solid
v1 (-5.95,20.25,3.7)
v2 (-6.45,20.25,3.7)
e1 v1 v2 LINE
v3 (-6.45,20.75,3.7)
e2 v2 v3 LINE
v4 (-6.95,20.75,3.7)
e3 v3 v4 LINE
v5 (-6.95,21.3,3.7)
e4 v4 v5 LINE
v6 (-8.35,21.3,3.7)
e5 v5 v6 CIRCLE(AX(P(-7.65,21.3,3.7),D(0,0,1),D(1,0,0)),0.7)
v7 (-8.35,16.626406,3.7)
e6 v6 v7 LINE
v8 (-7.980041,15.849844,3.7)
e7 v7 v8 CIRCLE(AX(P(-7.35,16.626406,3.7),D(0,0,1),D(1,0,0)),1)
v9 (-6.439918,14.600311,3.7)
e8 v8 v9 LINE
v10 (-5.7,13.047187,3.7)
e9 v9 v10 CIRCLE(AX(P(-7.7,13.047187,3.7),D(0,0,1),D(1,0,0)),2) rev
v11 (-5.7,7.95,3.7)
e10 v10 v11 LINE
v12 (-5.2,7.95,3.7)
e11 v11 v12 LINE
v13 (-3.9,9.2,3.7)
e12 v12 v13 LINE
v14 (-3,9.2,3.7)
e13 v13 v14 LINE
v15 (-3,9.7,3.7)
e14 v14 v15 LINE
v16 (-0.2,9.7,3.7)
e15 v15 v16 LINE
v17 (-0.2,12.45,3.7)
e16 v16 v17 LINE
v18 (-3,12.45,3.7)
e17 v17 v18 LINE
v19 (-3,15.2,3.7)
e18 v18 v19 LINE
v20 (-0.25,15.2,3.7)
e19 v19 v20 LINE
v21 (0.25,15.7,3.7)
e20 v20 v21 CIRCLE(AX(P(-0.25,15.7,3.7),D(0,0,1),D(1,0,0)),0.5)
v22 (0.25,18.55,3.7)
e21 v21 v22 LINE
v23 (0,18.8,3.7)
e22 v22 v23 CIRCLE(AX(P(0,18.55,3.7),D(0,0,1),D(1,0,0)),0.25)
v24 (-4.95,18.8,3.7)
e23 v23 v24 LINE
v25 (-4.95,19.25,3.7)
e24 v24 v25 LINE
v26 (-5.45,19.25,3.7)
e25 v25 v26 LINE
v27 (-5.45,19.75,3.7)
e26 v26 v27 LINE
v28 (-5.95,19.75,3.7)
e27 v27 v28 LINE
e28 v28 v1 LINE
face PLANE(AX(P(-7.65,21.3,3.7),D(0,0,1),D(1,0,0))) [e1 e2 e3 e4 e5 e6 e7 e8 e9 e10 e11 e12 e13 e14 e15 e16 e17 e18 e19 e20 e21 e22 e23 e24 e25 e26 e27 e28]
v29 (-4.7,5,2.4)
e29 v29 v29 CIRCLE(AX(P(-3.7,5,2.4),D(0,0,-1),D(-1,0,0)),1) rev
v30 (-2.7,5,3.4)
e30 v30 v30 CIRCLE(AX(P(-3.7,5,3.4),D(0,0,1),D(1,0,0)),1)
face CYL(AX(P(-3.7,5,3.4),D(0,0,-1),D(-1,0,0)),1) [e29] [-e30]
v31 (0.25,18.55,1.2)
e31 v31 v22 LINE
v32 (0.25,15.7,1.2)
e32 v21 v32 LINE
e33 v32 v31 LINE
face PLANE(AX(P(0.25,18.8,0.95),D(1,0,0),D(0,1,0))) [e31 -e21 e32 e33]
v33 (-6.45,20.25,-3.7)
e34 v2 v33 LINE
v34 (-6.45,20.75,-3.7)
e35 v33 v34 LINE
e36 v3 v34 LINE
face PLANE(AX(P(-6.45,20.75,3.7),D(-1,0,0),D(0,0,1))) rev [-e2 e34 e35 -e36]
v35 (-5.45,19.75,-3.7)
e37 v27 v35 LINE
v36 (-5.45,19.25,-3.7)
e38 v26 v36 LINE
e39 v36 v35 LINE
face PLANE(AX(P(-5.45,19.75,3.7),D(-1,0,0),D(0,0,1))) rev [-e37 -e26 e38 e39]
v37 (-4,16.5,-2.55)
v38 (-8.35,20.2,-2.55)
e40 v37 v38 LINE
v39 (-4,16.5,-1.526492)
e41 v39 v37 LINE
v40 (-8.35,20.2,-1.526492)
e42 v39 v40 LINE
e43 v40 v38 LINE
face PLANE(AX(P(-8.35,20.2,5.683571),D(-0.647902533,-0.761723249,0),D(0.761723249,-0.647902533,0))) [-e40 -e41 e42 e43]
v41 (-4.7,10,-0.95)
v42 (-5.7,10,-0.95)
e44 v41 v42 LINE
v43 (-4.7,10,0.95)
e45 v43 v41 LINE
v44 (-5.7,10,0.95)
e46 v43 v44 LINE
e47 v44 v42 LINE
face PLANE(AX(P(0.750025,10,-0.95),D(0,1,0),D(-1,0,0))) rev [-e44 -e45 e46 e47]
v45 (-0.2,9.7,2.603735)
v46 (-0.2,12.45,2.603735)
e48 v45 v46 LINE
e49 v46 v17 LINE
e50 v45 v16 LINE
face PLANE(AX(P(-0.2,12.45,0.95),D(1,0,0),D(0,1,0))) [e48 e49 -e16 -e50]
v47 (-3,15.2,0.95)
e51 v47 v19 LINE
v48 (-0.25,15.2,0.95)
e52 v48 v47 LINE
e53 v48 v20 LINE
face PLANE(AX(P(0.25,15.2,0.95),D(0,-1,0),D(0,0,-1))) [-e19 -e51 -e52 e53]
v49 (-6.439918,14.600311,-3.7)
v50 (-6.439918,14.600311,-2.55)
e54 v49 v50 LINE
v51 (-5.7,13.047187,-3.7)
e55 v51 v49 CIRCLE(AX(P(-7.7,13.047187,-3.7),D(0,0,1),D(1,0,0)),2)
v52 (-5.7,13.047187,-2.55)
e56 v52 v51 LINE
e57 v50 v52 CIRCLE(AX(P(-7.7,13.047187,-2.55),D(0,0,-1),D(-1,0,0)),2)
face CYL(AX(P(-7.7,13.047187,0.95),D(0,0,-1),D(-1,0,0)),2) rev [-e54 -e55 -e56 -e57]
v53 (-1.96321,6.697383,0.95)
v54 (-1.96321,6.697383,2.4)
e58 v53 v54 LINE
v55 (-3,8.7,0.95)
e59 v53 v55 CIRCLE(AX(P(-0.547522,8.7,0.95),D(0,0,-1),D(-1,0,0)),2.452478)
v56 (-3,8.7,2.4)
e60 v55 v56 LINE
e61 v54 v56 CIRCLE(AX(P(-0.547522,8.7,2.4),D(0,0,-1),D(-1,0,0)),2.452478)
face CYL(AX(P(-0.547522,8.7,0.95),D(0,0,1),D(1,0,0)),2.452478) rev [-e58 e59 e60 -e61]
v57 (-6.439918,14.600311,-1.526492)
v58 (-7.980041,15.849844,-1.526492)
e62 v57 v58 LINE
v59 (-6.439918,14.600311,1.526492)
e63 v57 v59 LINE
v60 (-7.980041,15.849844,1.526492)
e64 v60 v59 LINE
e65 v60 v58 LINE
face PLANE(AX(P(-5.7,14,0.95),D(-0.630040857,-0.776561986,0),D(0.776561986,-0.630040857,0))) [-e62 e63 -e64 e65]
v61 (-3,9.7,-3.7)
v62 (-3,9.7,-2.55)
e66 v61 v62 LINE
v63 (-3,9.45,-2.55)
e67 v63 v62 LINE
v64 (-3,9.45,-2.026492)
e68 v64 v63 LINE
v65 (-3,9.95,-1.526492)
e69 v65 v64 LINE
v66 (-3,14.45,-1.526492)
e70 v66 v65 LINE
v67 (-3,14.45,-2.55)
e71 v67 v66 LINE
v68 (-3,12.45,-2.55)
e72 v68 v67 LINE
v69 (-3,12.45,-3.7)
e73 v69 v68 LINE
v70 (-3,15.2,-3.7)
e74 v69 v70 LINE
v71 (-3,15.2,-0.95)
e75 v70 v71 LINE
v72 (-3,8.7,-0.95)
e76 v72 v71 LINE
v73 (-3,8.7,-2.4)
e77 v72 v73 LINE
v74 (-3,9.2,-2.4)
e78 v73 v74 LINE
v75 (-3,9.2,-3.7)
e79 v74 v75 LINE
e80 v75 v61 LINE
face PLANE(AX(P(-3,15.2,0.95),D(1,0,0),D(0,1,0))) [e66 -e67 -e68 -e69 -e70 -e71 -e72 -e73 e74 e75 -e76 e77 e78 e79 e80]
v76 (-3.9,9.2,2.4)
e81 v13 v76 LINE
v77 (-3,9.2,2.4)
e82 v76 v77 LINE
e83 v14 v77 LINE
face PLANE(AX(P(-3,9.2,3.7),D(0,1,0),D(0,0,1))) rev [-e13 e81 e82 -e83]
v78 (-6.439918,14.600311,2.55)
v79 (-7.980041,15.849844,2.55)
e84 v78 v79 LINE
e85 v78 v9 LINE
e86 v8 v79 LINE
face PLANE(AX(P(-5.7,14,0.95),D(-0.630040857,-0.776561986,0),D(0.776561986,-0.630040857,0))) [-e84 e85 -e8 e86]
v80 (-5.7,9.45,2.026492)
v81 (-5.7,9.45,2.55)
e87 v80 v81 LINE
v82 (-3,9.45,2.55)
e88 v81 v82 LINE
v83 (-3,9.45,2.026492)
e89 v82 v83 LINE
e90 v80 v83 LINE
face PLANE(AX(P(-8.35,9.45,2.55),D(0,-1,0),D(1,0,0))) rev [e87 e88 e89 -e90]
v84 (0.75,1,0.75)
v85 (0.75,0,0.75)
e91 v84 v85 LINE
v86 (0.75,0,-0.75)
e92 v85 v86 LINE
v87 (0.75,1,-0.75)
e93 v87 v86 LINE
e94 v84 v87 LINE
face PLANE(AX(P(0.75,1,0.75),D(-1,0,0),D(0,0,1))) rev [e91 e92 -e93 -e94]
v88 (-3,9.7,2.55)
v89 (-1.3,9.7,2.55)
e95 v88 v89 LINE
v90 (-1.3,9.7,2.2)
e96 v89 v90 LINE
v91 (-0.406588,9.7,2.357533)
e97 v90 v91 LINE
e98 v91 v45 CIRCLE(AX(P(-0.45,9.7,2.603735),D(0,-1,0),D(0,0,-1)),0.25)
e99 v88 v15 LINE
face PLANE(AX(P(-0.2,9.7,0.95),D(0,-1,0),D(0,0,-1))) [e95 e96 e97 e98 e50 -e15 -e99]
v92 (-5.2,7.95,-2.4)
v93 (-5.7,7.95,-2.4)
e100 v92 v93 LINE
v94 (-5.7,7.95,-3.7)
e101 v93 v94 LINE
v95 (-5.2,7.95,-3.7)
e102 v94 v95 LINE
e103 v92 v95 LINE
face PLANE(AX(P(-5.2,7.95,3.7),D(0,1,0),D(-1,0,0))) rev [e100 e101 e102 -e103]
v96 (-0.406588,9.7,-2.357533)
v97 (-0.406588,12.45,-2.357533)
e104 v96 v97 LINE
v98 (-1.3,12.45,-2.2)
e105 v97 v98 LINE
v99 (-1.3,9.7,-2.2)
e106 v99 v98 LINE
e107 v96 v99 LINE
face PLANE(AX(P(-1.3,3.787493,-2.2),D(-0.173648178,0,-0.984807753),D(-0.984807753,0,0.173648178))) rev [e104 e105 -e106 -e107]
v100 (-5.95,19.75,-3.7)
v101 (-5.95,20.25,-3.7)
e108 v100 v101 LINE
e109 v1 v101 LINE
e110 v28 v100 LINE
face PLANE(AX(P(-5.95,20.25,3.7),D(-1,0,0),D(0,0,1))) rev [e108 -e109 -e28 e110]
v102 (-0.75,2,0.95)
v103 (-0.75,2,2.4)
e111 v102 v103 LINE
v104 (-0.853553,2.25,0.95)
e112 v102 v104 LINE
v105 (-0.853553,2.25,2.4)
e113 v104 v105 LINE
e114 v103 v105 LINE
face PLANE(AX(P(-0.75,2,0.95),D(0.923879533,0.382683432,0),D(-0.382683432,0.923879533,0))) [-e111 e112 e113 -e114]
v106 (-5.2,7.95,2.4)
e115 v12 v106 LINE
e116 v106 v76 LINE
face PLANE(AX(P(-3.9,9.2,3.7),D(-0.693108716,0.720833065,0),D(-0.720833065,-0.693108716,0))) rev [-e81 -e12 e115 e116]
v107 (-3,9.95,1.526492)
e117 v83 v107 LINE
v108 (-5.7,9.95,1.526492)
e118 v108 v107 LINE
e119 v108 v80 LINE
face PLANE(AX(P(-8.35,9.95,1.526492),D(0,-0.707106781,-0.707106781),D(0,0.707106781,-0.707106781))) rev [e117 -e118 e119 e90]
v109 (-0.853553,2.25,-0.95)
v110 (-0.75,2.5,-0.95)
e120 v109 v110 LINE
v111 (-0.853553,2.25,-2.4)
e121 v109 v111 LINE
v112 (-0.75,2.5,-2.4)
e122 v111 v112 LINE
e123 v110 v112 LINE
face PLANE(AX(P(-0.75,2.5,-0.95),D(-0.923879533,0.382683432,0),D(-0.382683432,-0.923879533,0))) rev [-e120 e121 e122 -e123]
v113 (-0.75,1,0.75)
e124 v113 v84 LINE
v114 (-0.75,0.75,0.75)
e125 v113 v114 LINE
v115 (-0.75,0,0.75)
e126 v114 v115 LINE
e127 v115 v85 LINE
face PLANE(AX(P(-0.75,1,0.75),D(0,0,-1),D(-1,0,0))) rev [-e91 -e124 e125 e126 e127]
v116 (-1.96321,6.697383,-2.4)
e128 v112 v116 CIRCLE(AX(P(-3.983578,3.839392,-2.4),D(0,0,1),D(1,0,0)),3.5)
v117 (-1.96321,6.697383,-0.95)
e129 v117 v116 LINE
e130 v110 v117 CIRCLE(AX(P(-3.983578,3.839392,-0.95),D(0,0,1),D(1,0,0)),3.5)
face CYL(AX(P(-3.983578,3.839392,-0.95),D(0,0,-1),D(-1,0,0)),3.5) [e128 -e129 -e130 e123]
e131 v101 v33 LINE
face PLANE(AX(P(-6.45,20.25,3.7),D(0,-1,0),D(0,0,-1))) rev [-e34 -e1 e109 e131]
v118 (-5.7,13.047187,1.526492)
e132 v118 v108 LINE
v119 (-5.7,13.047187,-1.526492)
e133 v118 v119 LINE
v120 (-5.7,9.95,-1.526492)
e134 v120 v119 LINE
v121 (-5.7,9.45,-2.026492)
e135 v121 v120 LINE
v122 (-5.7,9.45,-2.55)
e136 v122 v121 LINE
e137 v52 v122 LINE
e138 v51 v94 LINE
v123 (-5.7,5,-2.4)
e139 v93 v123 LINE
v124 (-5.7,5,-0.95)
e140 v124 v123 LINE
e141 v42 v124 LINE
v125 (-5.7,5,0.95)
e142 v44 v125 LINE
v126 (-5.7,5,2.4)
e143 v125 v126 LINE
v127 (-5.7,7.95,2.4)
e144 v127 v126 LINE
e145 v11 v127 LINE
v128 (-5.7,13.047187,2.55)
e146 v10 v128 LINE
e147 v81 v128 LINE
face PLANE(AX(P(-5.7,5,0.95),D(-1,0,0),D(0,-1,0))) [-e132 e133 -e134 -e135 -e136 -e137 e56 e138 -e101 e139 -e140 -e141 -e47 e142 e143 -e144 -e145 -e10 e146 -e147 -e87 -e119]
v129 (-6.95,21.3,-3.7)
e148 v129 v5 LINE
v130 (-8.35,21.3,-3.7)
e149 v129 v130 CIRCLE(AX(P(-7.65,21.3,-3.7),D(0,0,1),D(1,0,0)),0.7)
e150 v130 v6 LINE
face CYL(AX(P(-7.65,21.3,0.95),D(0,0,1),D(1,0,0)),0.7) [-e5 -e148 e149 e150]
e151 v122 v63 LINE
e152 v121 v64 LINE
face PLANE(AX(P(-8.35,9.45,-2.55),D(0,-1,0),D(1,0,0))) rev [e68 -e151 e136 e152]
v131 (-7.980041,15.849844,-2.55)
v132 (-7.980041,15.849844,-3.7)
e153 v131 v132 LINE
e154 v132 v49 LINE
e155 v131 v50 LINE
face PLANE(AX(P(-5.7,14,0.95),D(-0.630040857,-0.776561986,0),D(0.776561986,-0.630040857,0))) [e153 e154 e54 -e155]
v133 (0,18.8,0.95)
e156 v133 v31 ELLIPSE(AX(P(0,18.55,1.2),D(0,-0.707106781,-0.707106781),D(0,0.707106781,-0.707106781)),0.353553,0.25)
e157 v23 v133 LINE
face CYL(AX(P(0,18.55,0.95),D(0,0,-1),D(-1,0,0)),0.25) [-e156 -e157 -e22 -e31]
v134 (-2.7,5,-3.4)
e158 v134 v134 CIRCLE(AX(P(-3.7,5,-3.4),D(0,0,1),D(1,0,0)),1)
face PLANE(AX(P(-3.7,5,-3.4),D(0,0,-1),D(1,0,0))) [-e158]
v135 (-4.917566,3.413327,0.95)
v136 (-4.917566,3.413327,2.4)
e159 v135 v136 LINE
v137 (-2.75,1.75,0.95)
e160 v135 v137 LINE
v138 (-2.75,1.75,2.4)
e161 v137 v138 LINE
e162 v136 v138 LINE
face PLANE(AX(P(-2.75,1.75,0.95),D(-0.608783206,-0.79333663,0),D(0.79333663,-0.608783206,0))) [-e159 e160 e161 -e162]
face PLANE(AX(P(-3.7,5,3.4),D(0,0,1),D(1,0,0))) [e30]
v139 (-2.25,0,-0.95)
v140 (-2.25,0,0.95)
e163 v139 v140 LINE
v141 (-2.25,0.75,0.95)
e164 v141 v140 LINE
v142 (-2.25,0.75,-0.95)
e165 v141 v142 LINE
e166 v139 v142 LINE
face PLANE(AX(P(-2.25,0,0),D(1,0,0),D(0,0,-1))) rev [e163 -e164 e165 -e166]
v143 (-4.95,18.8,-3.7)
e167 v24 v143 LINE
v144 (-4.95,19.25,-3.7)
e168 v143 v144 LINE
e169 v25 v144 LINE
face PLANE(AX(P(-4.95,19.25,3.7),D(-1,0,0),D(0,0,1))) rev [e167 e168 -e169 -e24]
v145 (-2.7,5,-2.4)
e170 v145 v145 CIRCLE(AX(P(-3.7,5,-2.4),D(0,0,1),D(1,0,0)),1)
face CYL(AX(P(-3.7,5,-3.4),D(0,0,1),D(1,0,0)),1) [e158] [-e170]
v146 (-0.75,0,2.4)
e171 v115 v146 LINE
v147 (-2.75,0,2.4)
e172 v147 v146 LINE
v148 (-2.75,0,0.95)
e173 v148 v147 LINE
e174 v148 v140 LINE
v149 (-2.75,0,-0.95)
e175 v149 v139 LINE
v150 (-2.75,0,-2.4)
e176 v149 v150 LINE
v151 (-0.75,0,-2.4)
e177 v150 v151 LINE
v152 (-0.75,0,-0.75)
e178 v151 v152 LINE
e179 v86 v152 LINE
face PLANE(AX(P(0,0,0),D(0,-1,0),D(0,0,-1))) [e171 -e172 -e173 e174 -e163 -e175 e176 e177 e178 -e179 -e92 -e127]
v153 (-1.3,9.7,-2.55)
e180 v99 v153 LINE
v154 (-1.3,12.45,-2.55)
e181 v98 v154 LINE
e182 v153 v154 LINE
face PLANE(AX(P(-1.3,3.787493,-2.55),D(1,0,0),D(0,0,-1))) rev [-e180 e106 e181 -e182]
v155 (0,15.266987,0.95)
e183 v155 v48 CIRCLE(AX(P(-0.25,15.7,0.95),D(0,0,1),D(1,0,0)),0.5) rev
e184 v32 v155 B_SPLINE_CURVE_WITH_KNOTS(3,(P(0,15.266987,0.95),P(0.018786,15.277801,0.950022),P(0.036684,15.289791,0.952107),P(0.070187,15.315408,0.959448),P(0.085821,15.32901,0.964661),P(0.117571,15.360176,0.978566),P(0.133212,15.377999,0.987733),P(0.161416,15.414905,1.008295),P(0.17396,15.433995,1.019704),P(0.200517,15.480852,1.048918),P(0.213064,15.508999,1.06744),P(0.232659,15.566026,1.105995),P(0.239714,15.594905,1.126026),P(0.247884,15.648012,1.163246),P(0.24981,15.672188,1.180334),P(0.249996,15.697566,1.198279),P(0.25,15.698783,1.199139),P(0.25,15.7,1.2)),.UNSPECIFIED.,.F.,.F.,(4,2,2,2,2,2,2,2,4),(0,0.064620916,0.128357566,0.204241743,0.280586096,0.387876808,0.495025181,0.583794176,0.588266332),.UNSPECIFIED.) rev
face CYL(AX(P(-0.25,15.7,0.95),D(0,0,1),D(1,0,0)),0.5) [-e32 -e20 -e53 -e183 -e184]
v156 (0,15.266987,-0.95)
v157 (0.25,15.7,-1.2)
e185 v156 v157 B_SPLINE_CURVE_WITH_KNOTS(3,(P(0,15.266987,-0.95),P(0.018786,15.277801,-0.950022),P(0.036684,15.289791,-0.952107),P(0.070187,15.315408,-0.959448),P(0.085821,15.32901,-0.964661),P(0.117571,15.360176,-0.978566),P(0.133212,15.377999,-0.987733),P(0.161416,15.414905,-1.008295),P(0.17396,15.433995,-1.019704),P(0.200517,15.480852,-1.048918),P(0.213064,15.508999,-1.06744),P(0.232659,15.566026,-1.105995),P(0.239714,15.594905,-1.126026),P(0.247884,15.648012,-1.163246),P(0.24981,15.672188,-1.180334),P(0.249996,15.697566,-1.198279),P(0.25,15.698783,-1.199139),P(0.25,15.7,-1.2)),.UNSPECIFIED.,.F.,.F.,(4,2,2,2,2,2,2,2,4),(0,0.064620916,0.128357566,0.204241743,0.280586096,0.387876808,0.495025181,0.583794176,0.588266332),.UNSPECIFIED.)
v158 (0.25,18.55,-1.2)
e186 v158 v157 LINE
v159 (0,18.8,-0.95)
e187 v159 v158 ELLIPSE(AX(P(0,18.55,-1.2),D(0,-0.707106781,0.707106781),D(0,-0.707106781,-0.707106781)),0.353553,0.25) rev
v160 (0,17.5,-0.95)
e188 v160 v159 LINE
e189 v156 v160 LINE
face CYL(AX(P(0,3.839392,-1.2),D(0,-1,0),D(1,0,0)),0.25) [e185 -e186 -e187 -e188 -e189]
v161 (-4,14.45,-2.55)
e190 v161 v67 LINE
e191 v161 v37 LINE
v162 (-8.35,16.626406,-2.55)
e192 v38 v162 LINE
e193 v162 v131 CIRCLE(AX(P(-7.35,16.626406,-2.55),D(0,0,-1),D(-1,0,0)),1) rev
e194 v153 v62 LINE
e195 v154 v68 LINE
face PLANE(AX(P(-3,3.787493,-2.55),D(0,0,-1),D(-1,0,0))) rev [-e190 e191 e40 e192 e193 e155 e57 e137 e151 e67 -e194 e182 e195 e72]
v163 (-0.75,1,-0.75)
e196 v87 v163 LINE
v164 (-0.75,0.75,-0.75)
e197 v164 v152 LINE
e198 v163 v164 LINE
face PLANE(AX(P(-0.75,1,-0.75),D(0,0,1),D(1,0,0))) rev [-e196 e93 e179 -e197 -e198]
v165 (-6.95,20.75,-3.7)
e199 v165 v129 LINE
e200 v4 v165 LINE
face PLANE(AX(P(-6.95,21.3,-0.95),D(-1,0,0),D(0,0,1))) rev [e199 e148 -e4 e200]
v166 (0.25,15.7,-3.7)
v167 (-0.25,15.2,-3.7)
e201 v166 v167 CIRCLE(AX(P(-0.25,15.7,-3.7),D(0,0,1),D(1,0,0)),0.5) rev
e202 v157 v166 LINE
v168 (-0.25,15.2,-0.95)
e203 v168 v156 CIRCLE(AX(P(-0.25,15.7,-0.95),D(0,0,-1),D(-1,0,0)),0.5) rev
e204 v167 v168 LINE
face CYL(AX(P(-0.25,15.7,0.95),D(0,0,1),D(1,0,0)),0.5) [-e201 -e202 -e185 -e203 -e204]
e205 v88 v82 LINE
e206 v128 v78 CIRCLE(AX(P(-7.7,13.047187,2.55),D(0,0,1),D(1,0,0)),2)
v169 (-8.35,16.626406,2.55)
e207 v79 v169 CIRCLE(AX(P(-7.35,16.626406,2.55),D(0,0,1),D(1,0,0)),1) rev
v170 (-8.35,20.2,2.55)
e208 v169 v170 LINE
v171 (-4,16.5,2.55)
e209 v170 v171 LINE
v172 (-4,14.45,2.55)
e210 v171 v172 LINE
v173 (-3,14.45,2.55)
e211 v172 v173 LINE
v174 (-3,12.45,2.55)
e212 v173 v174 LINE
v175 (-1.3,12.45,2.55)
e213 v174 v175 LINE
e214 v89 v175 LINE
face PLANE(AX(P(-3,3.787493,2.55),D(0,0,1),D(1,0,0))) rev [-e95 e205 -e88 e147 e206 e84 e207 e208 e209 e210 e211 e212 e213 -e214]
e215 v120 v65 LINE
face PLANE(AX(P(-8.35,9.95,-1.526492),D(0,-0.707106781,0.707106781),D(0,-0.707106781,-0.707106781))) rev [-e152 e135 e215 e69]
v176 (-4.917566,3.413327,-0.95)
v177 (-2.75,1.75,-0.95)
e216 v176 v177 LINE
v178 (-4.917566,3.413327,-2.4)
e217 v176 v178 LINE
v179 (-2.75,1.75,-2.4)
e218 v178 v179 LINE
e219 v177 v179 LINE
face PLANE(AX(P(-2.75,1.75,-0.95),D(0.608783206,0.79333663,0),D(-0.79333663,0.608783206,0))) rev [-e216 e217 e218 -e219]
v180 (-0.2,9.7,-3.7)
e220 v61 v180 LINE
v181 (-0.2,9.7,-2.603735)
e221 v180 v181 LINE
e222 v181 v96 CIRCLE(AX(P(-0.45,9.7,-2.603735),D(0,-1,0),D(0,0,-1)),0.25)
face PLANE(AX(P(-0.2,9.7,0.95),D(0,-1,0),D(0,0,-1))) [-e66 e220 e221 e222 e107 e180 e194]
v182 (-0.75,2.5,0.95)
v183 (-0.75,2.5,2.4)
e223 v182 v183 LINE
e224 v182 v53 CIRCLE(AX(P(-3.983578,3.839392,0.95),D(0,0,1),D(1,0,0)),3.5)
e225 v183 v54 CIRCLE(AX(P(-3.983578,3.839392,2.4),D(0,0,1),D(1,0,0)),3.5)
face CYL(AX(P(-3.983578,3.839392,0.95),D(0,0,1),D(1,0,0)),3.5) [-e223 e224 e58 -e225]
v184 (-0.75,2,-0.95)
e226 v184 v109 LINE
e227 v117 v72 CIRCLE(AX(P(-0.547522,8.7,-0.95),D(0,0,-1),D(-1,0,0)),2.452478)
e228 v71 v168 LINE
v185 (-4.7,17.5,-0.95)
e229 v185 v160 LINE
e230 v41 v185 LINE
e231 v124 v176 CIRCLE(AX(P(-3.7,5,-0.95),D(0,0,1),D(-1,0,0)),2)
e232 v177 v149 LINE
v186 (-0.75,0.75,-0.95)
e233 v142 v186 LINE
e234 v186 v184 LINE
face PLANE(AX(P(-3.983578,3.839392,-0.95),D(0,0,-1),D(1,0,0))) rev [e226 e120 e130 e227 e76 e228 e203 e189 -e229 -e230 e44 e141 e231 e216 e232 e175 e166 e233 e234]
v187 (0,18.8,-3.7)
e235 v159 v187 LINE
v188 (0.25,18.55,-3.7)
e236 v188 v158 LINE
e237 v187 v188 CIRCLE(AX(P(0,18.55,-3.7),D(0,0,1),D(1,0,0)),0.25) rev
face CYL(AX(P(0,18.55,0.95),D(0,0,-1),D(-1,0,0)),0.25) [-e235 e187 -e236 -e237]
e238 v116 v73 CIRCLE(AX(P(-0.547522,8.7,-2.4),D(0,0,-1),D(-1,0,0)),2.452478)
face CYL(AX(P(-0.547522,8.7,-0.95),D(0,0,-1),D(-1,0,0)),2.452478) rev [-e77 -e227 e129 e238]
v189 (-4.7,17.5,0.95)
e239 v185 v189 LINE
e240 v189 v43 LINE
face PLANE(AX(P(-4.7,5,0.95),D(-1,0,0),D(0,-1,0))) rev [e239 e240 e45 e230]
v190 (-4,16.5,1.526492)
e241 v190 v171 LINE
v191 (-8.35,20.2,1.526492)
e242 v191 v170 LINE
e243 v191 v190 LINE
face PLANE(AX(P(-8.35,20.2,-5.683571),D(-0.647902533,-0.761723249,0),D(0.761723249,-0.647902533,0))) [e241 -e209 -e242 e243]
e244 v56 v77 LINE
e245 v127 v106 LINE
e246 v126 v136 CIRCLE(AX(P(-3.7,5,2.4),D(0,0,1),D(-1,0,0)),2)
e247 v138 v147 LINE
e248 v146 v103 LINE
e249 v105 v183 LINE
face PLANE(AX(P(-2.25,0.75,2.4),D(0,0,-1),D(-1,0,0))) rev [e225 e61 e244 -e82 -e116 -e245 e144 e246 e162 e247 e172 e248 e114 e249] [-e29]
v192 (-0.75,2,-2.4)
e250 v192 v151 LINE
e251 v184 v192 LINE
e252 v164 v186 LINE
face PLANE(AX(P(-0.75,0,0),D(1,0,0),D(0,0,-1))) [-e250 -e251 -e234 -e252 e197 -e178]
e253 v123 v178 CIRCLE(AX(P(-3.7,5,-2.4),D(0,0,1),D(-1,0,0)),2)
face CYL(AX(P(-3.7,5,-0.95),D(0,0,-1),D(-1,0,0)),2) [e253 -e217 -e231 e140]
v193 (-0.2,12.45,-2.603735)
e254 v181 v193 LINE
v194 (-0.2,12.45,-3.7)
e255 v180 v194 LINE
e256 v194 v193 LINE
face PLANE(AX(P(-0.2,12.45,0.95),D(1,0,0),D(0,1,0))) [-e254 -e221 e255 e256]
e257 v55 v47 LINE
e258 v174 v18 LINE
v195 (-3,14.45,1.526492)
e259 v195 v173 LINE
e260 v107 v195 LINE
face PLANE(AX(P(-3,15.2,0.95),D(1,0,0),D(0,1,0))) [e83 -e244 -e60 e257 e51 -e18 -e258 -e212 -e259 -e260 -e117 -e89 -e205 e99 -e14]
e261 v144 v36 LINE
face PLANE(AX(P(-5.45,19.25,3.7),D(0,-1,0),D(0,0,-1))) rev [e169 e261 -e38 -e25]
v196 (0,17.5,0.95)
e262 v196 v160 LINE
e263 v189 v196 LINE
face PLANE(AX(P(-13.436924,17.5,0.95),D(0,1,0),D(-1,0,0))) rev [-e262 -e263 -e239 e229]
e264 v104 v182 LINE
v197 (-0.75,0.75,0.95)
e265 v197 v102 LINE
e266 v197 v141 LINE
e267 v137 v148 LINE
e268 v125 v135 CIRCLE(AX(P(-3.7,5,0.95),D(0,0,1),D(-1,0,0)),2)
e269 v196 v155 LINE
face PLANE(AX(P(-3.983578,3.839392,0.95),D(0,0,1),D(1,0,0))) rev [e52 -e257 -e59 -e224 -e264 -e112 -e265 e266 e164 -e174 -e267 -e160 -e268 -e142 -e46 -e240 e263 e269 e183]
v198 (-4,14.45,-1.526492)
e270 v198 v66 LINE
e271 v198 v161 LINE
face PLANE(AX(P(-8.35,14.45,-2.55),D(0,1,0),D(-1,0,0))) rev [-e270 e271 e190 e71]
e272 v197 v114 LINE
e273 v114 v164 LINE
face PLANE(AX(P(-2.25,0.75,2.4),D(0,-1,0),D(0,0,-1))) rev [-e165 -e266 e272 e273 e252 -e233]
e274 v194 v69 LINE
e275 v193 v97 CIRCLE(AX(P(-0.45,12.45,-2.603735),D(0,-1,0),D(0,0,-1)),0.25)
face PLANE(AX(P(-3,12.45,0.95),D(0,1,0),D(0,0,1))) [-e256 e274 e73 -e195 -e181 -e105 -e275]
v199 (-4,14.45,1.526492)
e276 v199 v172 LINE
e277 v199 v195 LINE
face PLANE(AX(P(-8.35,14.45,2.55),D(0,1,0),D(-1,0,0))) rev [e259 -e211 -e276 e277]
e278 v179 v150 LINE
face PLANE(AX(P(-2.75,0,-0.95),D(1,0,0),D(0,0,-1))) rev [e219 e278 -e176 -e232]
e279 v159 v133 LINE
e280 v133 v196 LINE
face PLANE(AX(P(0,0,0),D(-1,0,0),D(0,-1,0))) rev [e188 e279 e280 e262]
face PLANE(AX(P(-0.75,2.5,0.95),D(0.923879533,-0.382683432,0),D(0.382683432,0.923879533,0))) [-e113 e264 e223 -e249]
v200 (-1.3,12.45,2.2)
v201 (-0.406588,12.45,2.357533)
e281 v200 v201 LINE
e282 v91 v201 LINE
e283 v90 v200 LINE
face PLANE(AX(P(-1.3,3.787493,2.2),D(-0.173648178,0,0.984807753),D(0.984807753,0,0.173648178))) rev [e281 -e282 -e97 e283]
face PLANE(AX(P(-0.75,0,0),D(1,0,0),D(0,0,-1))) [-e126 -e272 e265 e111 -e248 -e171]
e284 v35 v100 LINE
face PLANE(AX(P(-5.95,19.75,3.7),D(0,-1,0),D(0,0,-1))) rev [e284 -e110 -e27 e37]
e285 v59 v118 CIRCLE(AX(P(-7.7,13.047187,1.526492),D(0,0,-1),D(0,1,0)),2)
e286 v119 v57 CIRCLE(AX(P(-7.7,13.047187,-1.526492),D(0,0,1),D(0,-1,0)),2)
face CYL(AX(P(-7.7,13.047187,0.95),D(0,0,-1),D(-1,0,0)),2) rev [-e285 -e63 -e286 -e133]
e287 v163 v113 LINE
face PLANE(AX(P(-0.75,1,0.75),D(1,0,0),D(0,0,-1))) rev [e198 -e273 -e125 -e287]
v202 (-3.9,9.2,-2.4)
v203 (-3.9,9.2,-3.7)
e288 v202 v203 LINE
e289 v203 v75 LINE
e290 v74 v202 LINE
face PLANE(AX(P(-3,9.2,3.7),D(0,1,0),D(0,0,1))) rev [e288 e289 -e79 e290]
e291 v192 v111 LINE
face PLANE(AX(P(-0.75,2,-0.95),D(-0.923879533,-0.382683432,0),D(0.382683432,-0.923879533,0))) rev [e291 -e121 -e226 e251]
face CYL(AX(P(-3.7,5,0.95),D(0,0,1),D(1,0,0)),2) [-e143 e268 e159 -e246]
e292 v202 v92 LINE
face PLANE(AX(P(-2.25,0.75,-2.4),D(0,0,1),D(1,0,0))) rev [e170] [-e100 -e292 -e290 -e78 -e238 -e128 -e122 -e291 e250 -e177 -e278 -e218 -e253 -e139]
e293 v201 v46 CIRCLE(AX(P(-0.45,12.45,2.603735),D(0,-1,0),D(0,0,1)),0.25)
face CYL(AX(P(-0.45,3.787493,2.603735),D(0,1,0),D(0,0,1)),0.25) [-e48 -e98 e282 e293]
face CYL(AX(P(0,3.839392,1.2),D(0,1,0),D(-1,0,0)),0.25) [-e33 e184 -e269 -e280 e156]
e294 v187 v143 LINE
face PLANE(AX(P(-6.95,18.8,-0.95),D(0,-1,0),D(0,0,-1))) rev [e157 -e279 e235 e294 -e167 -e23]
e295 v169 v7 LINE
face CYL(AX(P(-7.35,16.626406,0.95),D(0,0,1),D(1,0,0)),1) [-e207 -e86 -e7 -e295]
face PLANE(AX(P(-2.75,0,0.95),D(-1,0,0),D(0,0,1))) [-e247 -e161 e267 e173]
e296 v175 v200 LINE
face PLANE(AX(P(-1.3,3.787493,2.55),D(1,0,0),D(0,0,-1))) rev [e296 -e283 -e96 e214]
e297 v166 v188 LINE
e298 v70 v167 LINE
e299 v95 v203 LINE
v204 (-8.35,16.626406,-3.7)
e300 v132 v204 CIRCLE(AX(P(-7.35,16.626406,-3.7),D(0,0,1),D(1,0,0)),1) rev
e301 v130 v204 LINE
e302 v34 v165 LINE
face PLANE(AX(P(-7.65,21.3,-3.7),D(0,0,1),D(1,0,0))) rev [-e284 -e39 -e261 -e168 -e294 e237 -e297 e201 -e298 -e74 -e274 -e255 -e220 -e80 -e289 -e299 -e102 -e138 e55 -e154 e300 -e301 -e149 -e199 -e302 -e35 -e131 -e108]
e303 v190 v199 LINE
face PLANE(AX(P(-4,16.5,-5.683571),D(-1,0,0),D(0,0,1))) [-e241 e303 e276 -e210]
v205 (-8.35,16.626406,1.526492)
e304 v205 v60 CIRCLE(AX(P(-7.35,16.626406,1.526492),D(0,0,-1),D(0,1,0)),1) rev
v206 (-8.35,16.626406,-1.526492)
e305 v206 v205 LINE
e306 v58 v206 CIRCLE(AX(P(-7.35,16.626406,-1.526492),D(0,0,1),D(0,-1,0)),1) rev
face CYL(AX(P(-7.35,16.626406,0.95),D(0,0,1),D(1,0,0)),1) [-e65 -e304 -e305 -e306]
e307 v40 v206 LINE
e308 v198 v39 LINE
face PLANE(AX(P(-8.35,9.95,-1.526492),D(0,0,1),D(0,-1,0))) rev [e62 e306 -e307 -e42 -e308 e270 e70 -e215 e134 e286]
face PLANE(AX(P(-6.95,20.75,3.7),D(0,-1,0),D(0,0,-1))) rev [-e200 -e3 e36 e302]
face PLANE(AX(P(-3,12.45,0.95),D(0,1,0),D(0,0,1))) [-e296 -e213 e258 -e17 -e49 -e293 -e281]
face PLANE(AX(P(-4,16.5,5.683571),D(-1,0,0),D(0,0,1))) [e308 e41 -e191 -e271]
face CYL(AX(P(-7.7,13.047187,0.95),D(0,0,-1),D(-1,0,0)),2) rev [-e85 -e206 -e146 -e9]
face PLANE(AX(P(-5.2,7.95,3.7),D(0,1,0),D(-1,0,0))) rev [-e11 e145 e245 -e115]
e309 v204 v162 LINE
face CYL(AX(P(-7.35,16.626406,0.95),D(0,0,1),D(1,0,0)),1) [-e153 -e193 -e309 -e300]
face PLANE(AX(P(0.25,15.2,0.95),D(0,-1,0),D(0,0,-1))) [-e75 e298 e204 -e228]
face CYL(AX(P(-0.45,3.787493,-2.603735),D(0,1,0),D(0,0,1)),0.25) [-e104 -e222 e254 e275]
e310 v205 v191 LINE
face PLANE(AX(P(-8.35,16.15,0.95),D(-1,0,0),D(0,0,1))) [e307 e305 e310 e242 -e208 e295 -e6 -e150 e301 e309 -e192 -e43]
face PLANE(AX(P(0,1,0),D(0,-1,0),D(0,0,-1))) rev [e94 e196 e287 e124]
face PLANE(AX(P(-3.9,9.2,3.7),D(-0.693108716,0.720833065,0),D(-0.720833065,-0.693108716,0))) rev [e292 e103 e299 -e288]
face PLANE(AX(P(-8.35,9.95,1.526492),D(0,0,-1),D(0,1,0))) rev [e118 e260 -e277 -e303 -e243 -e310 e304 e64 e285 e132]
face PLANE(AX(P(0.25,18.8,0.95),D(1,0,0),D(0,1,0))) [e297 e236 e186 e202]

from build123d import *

# Parameters (mm, degrees)
SKETCH1_W                 = 1.5
SKETCH1_H                 = 1.5
BASE_BLOCK_DEPTH          = 1
SKETCH2_W                 = 4.8
SKETCH2_H                 = 0.75
BASE_BRIDGE_DEPTH         = 1.5
LOWER_SIDE_1_DEPTH        = 1.45
SKETCH6_R                 = 1
PIVOT_DEPTH               = 1
BODY_BLOCK_DEPTH          = 3.7
SKETCH8_W                 = 1.9
SKETCH8_H                 = 8.25
REAR_CUT_THROUGH_DEPTH    = 24.222672112
CLIP_FORMING_DEPTH        = 2.75
THROUGH_HOLES_DEPTH       = 23.941501695
SKETCH11_W                = 1.9
SKETCH11_H                = 7.5
PCB_SLOT_DEPTH            = 4.95
THROUGH_HOLE_REAR_1_DEPTH = 1.023508356
THROUGH_HOLE_REAR_2_DEPTH = 1.023508356
SKETCH15_W                = 1.9
SKETCH15_H                = 1.3
PCB_SLOT_TOP_DEPTH        = 0.25
REAR_FILLET_2MM_R         = 2
REAR_FILLET_1MM_R         = 1
GUIDE_FILLET_0_25MM_R     = 0.25
GUIDE_FILLET_0_5MM_R      = 0.5


# Some blends are built 0.0001 mm under size
with BuildPart() as part:
    # Sketch1 → Base Block (new body)
    with BuildSketch(Plane(origin=(0, 0, 0), x_dir=(1, 0, 0), z_dir=(0, 1, 0))):
        Rectangle(SKETCH1_W, SKETCH1_H)
    extrude(amount=BASE_BLOCK_DEPTH)

    # Sketch2 → Base Bridge (add)
    with BuildSketch(Plane.ZY.offset(0.75)):
        with Locations((0, 0.375)):
            Rectangle(SKETCH2_W, SKETCH2_H)
    extrude(amount=BASE_BRIDGE_DEPTH)

    # Sketch5 → Lower Side 1 (add)
    with BuildSketch(Plane.XY.offset(2.4)):
        with BuildLine():
            Line((-0.75, 0), (-2.75, 0))
            Line((-2.75, 0), (-2.75, 1.75))
            Line((-2.75, 1.75), (-4.917566413, 3.413326741))
            ThreePointArc((-4.917566413, 3.413326741), (-5.493757624, 4.115447239), (-5.7, 5))
            Line((-5.7, 5), (-5.7, 14))
            Line((-5.7, 14), (-8.35, 16.15))
            Line((-8.35, 16.15), (-8.35, 21.3))
            ThreePointArc((-8.35, 21.3), (-7.65, 22), (-6.95, 21.3))
            Line((-6.95, 21.3), (-6.95, 18.8))
            Line((-6.95, 18.8), (0.25, 18.8))
            Line((0.25, 18.8), (0.25, 15.2))
            Line((0.25, 15.2), (-3, 15.2))
            Line((-3, 15.2), (-3, 12.45))
            Line((-3, 12.45), (-0.2, 12.45))
            Line((-0.2, 12.45), (-0.2, 9.7))
            Line((-0.2, 9.7), (-3, 9.7))
            Line((-3, 9.7), (-3, 8.7))
            ThreePointArc((-3, 8.7), (-2.725432986, 7.572457553), (-1.963210212, 6.697383009))
            ThreePointArc((-1.963210212, 6.697383009), (-0.621213938, 4.811248727), (-0.75, 2.5))
            Line((-0.75, 2.5), (-0.853553391, 2.25))
            Line((-0.853553391, 2.25), (-0.75, 2))
            Line((-0.75, 2), (-0.75, 0))
        make_face()
    lower_side_1 = extrude(amount=-LOWER_SIDE_1_DEPTH)

    # Sketch6 → Pivot (add)
    with BuildSketch(Plane.XY.offset(2.4)):
        with Locations(Location((-3.7, 5, 0), (0, 0, 180))):
            Circle(SKETCH6_R)
    pivot = extrude(amount=PIVOT_DEPTH)

    # Lower Side 2: Lower Side 1, Pivot across plane
    add(lower_side_1.mirror(Plane.XY))
    add(pivot.mirror(Plane.XY))

    # Sketch7 → Body Block (add, symmetric)
    with BuildSketch(Plane.XY):
        with BuildLine():
            Line((-8.35, 16.15), (-5.7, 14))
            Line((-5.7, 14), (-5.7, 7.95))
            Line((-5.7, 7.95), (-5.2, 7.95))
            Line((-5.2, 7.95), (-3.9, 9.2))
            Line((-3.9, 9.2), (-3, 9.2))
            Line((-3, 9.2), (-3, 9.7))
            Line((-3, 9.7), (-0.2, 9.7))
            Line((-0.2, 9.7), (-0.2, 12.45))
            Line((-0.2, 12.45), (-3, 12.45))
            Line((-3, 12.45), (-3, 15.2))
            Line((-3, 15.2), (0.25, 15.2))
            Line((0.25, 15.2), (0.25, 18.8))
            Line((0.25, 18.8), (-4.95, 18.8))
            Line((-4.95, 18.8), (-4.95, 19.25))
            Line((-4.95, 19.25), (-5.45, 19.25))
            Line((-5.45, 19.25), (-5.45, 19.75))
            Line((-5.45, 19.75), (-5.95, 19.75))
            Line((-5.95, 19.75), (-5.95, 20.25))
            Line((-5.95, 20.25), (-6.45, 20.25))
            Line((-6.45, 20.25), (-6.45, 20.75))
            Line((-6.45, 20.75), (-6.95, 20.75))
            Line((-6.95, 20.75), (-6.95, 21.3))
            ThreePointArc((-6.95, 21.3), (-7.65, 22), (-8.35, 21.3))
            Line((-8.35, 21.3), (-8.35, 16.15))
        make_face()
    extrude(amount=BODY_BLOCK_DEPTH, both=True)

    # Sketch8 → Rear Cut Through (cut, through all)
    with BuildSketch(Plane.ZY.offset(5.7)):
        with Locations((0, 5.875)):
            Rectangle(SKETCH8_W, SKETCH8_H)
    extrude(amount=-REAR_CUT_THROUGH_DEPTH, mode=Mode.SUBTRACT)

    # Sketch9 → Clip Forming (cut)
    with BuildSketch(Plane(origin=(0, 12.45, 0), x_dir=(1, 0, 0), z_dir=(0, 1, 0))):
        with BuildLine():
            Line((-1.3, -2.2), (-0.406587956, -2.357532648))
            ThreePointArc((-0.406587956, -2.357532648), (-0.258488889, -2.443037684), (-0.2, -2.603734587))
            Line((-0.2, -2.603734587), (-0.2, 2.603734587))
            ThreePointArc((-0.2, 2.603734587), (-0.258488889, 2.443037684), (-0.406587956, 2.357532648))
            Line((-0.406587956, 2.357532648), (-1.3, 2.2))
            Line((-1.3, 2.2), (-1.3, 2.55))
            Line((-1.3, 2.55), (-3, 2.55))
            Line((-3, 2.55), (-3, -2.55))
            Line((-3, -2.55), (-1.3, -2.55))
            Line((-1.3, -2.55), (-1.3, -2.2))
        make_face()
    extrude(amount=-CLIP_FORMING_DEPTH, mode=Mode.SUBTRACT)

    # Sketch10 → Through Holes (cut, through all)
    with BuildSketch(Plane(origin=(-3, 0, 0), x_dir=(0, 0, -1), z_dir=(1, 0, 0))):
        Polygon((-2.55, 14.45), (-1.526491644, 14.45), (-1.526491644, 9.95), (-2.026491644, 9.45), (-2.55, 9.45), align=None)
        Polygon((2.55, 14.45), (2.55, 9.45), (2.026491644, 9.45), (1.526491644, 9.95), (1.526491644, 14.45), align=None)
    extrude(amount=-THROUGH_HOLES_DEPTH, mode=Mode.SUBTRACT)

    # Sketch11 → PCB Slot (cut)
    with BuildSketch(Plane(origin=(0.25, 0, 0), x_dir=(0, 0, -1), z_dir=(1, 0, 0))):
        with Locations((0, 13.75)):
            Rectangle(SKETCH11_W, SKETCH11_H)
    extrude(amount=-PCB_SLOT_DEPTH, mode=Mode.SUBTRACT)

    # Sketch13 → Through Hole Rear 1 (cut)
    with BuildSketch(Plane.XY.offset(-2.55)):
        Polygon((-8.35, 20.2), (-4, 16.5), (-4, 14.45), (-6.254651163, 14.45), (-8.35, 16.15), align=None)
    extrude(amount=THROUGH_HOLE_REAR_1_DEPTH, mode=Mode.SUBTRACT)

    # Sketch14 → Through Hole Rear 2 (cut)
    with BuildSketch(Plane(origin=(0, 0, 2.55), x_dir=(-1, 0, 0), z_dir=(0, 0, -1))):
        Polygon((8.35, 20.2), (4, 16.5), (4, 14.45), (6.254651163, 14.45), (8.35, 16.15), align=None)
    extrude(amount=THROUGH_HOLE_REAR_2_DEPTH, mode=Mode.SUBTRACT)

    # Sketch15 → PCB Slot Top (cut)
    with BuildSketch(Plane(origin=(0.25, 0, 0), x_dir=(0, 0, -1), z_dir=(1, 0, 0))):
        with Locations((0, 18.15)):
            Rectangle(SKETCH15_W, SKETCH15_H)
    extrude(amount=-PCB_SLOT_TOP_DEPTH, mode=Mode.SUBTRACT)

    # Rear Fillet (2mm)
    rear_fillet_2mm_edges = [part.edges().sort_by_distance(p)[0] for p in [
        (-5.7, 14, 3.125),
        (-5.7, 14, 0),
        (-5.7, 14, -3.125),
    ]]
    fillet(rear_fillet_2mm_edges, radius=REAR_FILLET_2MM_R)

    # Rear Fillet (1mm)
    rear_fillet_1mm_edges = [part.edges().sort_by_distance(p)[0] for p in [
        (-8.35, 16.15, 0),
        (-8.35, 16.15, -3.125),
        (-8.35, 16.15, 3.125),
    ]]
    fillet(rear_fillet_1mm_edges, radius=REAR_FILLET_1MM_R)

    # Guide Fillet (0.25mm)
    guide_fillet_0_25mm_edges = [part.edges().sort_by_distance(p)[0] for p in [
        (0.25, 17, -0.95),
        (0.25, 17, 0.95),
        (0.25, 18.8, -2.325),
        (0.25, 18.8, 2.325),
    ]]
    fillet(guide_fillet_0_25mm_edges, radius=GUIDE_FILLET_0_25MM_R - 0.0001)  # a hair under: the kernel refuses the full size

    # Guide Fillet (0.5mm)
    # the kernel refuses this fillet: 0.5 mm, written as the material it takes off along each edge
    with BuildSketch(Plane(origin=(0.25, 15.2, -4.95), x_dir=(-1, 0, 0), z_dir=(0, 0, 1))) as guide_fillet_0_5mm_piece_1:
        with BuildLine():
            CenterArc((GUIDE_FILLET_0_5MM_R, -GUIDE_FILLET_0_5MM_R), GUIDE_FILLET_0_5MM_R, 90, 90)
            Line((0, -GUIDE_FILLET_0_5MM_R), (0, 0))
            Line((0, 0), (GUIDE_FILLET_0_5MM_R, 0))
        make_face()
    extrude(amount=5.0001, mode=Mode.SUBTRACT)
    with BuildSketch(Plane(origin=(0.25, 15.2, -0.0501), x_dir=(0, 1, 0), z_dir=(0, 0, 1))) as guide_fillet_0_5mm_piece_2:
        with BuildLine():
            CenterArc((GUIDE_FILLET_0_5MM_R, GUIDE_FILLET_0_5MM_R), GUIDE_FILLET_0_5MM_R, 180, 90)
            Line((0, GUIDE_FILLET_0_5MM_R), (0, 0))
            Line((0, 0), (GUIDE_FILLET_0_5MM_R, 0))
        make_face()
    extrude(amount=5.0001, mode=Mode.SUBTRACT)


solid = part.part
